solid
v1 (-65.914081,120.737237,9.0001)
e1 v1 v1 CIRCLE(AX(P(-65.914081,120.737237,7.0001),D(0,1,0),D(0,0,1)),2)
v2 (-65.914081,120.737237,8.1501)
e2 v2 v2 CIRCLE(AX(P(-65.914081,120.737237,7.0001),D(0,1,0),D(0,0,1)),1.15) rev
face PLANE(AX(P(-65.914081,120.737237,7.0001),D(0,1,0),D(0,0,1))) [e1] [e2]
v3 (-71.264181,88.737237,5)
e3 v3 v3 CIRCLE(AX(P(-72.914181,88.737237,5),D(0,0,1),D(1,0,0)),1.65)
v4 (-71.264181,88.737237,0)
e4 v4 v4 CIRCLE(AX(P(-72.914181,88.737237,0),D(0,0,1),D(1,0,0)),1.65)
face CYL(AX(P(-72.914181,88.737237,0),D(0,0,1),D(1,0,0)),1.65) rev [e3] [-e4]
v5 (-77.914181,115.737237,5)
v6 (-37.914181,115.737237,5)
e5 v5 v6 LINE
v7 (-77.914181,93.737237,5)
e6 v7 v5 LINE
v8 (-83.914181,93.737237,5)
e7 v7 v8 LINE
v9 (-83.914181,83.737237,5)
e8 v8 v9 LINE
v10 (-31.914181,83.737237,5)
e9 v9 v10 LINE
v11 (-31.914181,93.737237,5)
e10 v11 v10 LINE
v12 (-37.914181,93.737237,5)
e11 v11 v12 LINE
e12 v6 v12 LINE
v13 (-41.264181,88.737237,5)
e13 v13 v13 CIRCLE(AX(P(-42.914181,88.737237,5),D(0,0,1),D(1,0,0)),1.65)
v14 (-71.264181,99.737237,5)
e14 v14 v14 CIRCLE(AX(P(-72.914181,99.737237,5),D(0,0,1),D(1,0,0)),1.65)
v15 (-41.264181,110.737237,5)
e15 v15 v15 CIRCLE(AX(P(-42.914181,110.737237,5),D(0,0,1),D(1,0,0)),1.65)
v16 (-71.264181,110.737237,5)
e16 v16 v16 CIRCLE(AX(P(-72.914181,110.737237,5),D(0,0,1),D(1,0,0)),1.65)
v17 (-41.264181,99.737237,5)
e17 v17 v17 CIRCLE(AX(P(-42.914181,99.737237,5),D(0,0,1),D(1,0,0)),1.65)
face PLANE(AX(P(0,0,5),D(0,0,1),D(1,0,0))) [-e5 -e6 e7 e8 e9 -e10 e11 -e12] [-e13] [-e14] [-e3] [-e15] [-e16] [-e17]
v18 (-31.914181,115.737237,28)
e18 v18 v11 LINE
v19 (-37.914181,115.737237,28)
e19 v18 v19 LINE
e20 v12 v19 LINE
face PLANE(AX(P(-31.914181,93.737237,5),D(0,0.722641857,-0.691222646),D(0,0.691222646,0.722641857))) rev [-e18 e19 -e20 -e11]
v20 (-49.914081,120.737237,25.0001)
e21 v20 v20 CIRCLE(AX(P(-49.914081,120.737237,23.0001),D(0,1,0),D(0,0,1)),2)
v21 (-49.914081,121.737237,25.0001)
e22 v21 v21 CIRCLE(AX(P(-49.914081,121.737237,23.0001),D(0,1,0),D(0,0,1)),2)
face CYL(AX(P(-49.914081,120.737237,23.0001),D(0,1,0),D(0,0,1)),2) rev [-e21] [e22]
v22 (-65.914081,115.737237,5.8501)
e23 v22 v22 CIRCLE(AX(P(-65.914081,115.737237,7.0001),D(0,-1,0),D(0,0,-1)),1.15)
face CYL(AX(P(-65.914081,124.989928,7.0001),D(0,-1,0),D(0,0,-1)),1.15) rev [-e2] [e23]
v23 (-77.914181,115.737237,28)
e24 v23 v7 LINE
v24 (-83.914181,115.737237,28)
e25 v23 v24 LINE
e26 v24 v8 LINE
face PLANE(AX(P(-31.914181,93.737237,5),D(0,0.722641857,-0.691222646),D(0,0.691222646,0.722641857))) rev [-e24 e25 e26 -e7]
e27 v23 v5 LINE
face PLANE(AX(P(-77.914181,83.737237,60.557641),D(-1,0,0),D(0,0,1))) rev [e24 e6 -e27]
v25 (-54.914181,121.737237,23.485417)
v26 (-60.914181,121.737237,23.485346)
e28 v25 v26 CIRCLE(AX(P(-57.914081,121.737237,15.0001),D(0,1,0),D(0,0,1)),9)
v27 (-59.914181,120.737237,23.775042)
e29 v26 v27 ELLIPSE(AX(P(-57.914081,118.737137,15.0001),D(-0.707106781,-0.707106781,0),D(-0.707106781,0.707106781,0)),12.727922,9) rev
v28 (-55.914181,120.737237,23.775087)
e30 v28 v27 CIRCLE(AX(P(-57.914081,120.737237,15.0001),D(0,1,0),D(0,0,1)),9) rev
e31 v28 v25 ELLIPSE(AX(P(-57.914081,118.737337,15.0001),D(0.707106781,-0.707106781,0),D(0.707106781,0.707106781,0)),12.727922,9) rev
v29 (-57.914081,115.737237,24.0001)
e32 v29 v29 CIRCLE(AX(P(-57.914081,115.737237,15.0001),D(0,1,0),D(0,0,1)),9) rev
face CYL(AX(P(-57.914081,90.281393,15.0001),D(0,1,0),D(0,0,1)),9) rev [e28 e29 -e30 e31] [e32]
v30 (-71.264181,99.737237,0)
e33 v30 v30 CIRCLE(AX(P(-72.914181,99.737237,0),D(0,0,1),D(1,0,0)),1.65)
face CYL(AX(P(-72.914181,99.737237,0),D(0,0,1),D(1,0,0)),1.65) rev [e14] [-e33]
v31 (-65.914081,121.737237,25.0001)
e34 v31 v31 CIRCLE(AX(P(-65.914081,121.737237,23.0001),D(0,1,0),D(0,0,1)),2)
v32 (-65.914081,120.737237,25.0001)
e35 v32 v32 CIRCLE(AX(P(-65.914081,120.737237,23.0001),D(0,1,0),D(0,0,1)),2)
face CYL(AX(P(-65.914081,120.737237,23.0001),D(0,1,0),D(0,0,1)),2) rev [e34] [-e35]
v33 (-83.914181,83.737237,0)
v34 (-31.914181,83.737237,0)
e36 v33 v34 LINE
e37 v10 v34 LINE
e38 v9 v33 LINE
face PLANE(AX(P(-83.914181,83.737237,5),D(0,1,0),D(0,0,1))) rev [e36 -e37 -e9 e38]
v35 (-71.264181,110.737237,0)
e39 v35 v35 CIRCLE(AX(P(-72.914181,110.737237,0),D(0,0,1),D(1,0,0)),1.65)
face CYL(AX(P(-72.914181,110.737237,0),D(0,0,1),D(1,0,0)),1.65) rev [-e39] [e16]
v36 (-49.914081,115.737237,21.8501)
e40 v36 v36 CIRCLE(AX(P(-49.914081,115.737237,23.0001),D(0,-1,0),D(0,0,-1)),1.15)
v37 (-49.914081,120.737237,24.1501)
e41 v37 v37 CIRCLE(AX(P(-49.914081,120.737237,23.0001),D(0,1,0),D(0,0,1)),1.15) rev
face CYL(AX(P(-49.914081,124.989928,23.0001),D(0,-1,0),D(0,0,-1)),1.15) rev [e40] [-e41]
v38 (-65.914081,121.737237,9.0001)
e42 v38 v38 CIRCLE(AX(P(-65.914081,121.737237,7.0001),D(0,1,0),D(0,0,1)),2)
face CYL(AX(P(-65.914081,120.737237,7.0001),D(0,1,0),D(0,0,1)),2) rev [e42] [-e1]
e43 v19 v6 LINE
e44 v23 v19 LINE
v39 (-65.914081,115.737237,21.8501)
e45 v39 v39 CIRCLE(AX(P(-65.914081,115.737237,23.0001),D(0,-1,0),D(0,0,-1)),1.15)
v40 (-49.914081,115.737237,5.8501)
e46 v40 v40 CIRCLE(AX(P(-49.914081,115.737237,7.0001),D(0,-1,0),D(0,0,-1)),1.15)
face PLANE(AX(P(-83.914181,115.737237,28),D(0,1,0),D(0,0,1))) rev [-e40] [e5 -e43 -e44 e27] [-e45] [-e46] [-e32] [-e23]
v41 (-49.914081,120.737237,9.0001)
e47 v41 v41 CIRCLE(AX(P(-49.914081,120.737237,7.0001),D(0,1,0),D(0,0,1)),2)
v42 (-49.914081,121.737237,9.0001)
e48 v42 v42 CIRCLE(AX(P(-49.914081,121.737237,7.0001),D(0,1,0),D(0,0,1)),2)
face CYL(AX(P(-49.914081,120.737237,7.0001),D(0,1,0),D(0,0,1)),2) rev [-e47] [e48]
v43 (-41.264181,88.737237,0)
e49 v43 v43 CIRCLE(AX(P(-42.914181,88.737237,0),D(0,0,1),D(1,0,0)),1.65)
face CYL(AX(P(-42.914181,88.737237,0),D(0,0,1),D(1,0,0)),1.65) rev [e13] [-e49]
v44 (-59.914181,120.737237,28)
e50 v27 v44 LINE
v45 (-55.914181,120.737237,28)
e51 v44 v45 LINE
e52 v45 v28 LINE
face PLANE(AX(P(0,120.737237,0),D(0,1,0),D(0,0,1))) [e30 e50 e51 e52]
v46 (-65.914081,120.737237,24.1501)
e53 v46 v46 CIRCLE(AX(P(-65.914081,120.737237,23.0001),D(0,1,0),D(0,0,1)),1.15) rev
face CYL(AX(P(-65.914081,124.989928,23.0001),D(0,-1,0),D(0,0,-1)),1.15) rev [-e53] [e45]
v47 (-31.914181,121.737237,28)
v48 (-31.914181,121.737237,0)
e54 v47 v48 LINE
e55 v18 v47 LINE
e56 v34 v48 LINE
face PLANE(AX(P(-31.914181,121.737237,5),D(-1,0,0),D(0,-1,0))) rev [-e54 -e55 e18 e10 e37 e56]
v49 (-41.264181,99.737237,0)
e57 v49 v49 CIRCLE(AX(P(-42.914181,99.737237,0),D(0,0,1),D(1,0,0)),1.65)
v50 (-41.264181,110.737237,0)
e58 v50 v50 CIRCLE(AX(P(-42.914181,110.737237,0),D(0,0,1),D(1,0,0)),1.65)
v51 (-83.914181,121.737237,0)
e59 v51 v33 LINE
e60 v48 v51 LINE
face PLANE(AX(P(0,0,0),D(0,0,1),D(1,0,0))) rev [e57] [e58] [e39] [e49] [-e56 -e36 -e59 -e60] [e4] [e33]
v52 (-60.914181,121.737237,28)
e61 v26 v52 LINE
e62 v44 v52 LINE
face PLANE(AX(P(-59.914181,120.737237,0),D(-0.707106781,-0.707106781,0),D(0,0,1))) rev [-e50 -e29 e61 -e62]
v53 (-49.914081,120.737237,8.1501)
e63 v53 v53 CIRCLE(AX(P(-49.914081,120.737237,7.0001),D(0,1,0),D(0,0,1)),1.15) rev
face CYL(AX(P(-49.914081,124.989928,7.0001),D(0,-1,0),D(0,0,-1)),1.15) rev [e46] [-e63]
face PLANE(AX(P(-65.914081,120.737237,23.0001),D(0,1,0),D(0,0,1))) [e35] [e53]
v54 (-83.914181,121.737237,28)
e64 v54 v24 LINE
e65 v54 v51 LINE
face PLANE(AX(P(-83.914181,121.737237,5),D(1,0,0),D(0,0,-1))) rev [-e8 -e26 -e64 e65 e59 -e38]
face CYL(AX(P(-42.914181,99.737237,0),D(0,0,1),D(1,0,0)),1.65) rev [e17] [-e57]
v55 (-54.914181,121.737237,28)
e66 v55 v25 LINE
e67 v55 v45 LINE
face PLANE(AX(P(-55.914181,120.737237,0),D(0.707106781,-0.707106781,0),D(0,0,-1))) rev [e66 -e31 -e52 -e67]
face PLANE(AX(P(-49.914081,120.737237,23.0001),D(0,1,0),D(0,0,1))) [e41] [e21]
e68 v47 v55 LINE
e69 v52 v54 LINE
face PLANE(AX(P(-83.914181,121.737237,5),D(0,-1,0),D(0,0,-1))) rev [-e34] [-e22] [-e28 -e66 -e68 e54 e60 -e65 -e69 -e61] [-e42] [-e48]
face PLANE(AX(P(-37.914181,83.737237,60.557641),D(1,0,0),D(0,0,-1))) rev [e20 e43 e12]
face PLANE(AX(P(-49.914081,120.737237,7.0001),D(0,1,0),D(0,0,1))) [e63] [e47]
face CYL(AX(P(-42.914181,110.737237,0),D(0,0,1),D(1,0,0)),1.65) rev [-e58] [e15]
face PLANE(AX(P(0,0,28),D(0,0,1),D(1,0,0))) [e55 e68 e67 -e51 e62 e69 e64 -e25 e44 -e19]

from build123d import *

# Parameters (mm, degrees)
SKETCH1_W           = 52
SKETCH1_H           = 38
BOSS_EXTRUDE1_DEPTH = 5
SKETCH2_W           = 52
SKETCH2_H           = 6
BOSS_EXTRUDE2_DEPTH = 23
SKETCH3_R           = 9
CUT_EXTRUDE1_DEPTH  = 6
SKETCH4_R           = 1.15
CUT_EXTRUDE2_DEPTH  = 6
SKETCH5_W           = 6
SKETCH5_H           = 32
BOSS_EXTRUDE3_DEPTH = 23
CUT_EXTRUDE3_DEPTH  = 136.306891562
SKETCH7_R           = 1.65
CUT_EXTRUDE4_DEPTH  = 5
SKETCH8_R           = 1.65
CUT_EXTRUDE5_DEPTH  = 5
SKETCH9_W           = 6
SKETCH9_H           = 4.814654703
CUT_EXTRUDE6_DEPTH  = 1
CHAMFER1_SIZE       = 1
SKETCH10_R          = 2
CUT_EXTRUDE7_DEPTH  = 1


with BuildPart() as part:
    # Sketch1 → Boss-Extrude1 (new body)
    with BuildSketch(Plane.XY):
        with Locations((-57.914180529, 102.737237131)):
            Rectangle(SKETCH1_W, SKETCH1_H)
    extrude(amount=BOSS_EXTRUDE1_DEPTH)

    # Sketch2 → Boss-Extrude2 (add)
    with BuildSketch(Plane.XY.offset(5)):
        with Locations((-57.914180529, 118.737237131)):
            Rectangle(SKETCH2_W, SKETCH2_H)
    extrude(amount=BOSS_EXTRUDE2_DEPTH)

    # Sketch3 → Cut-Extrude1 (cut)
    with BuildSketch(Plane(origin=(0, 121.737237131, 0), x_dir=(1, 0, 0), z_dir=(0, 1, 0))):
        with Locations(Location((-57.914080529, -15.0001, 0), (0, 0, 270))):
            Circle(SKETCH3_R)
    extrude(amount=-CUT_EXTRUDE1_DEPTH, mode=Mode.SUBTRACT)

    # Sketch4 → Cut-Extrude2 (cut)
    with BuildSketch(Plane.XZ.offset(-115.737237131)):
        with Locations(Location((-65.914080529, 23.0001, 0), (0, 0, 270))):
            Circle(SKETCH4_R)
        with Locations(Location((-49.914080529, 23.0001, 0), (0, 0, 270))):
            Circle(SKETCH4_R)
        with Locations(Location((-49.914080529, 7.0001, 0), (0, 0, 270))):
            Circle(SKETCH4_R)
        with Locations(Location((-65.914080529, 7.0001, 0), (0, 0, 270))):
            Circle(SKETCH4_R)
    extrude(amount=-CUT_EXTRUDE2_DEPTH, mode=Mode.SUBTRACT)

    # Sketch5 → Boss-Extrude3 (add)
    with BuildSketch(Plane.XY.offset(5)):
        with Locations((-80.914180529, 99.737237131)):
            Rectangle(SKETCH5_W, SKETCH5_H)
        with Locations((-34.914180529, 99.737237131)):
            Rectangle(SKETCH5_W, SKETCH5_H)
    extrude(amount=BOSS_EXTRUDE3_DEPTH)

    # Sketch6 → Cut-Extrude3 (cut, through all)
    with BuildSketch(Plane.ZY.offset(83.914180529)):
        Polygon((5, 83.737237131), (5, 93.737237131), (28, 115.737237131), (34.8001915, 115.737237131), (34.8001915, 79.151046586), (5, 79.151046586), align=None)
    extrude(amount=-CUT_EXTRUDE3_DEPTH, mode=Mode.SUBTRACT)

    # Sketch7 → Cut-Extrude4 (cut)
    with BuildSketch(Plane.XY.offset(5)):
        with Locations((-42.914180529, 110.737237131)):
            Circle(SKETCH7_R)
        with Locations((-42.914180529, 88.737237131)):
            Circle(SKETCH7_R)
        with Locations((-72.914180529, 110.737237131)):
            Circle(SKETCH7_R)
        with Locations((-72.914180529, 88.737237131)):
            Circle(SKETCH7_R)
    extrude(amount=-CUT_EXTRUDE4_DEPTH, mode=Mode.SUBTRACT)

    # Sketch8 → Cut-Extrude5 (cut)
    with BuildSketch(Plane.XY.offset(5)):
        with Locations((-72.914180529, 99.737237131)):
            Circle(SKETCH8_R)
        with Locations((-42.914180529, 99.737237131)):
            Circle(SKETCH8_R)
    extrude(amount=-CUT_EXTRUDE5_DEPTH, mode=Mode.SUBTRACT)

    # Sketch9 → Cut-Extrude6 (cut)
    with BuildSketch(Plane(origin=(0, 121.737237131, 0), x_dir=(1, 0, 0), z_dir=(0, 1, 0))):
        with Locations((-57.914180529, -25.592672648)):
            Rectangle(SKETCH9_W, SKETCH9_H)
    extrude(amount=-CUT_EXTRUDE6_DEPTH, mode=Mode.SUBTRACT)

    # Chamfer1
    chamfer1_edges = [part.edges().sort_by_distance(p)[0] for p in [
        (-60.914180529, 120.737237131, 25.742673009),
        (-54.914180529, 120.737237131, 25.742708364),
    ]]
    chamfer(chamfer1_edges, length=CHAMFER1_SIZE - 0.0001)  # a hair under: the kernel refuses the full size

    # Sketch10 → Cut-Extrude7 (cut)
    with BuildSketch(Plane(origin=(0, 121.737237131, 0), x_dir=(1, 0, 0), z_dir=(0, 1, 0))):
        with Locations(Location((-65.914080529, -7.0001, 0), (0, 0, 270))):
            Circle(SKETCH10_R)
        with Locations(Location((-49.914080529, -7.0001, 0), (0, 0, 270))):
            Circle(SKETCH10_R)
        with Locations(Location((-49.914080529, -23.0001, 0), (0, 0, 270))):
            Circle(SKETCH10_R)
        with Locations(Location((-65.914080529, -23.0001, 0), (0, 0, 270))):
            Circle(SKETCH10_R)
    extrude(amount=-CUT_EXTRUDE7_DEPTH, mode=Mode.SUBTRACT)


solid = part.part
